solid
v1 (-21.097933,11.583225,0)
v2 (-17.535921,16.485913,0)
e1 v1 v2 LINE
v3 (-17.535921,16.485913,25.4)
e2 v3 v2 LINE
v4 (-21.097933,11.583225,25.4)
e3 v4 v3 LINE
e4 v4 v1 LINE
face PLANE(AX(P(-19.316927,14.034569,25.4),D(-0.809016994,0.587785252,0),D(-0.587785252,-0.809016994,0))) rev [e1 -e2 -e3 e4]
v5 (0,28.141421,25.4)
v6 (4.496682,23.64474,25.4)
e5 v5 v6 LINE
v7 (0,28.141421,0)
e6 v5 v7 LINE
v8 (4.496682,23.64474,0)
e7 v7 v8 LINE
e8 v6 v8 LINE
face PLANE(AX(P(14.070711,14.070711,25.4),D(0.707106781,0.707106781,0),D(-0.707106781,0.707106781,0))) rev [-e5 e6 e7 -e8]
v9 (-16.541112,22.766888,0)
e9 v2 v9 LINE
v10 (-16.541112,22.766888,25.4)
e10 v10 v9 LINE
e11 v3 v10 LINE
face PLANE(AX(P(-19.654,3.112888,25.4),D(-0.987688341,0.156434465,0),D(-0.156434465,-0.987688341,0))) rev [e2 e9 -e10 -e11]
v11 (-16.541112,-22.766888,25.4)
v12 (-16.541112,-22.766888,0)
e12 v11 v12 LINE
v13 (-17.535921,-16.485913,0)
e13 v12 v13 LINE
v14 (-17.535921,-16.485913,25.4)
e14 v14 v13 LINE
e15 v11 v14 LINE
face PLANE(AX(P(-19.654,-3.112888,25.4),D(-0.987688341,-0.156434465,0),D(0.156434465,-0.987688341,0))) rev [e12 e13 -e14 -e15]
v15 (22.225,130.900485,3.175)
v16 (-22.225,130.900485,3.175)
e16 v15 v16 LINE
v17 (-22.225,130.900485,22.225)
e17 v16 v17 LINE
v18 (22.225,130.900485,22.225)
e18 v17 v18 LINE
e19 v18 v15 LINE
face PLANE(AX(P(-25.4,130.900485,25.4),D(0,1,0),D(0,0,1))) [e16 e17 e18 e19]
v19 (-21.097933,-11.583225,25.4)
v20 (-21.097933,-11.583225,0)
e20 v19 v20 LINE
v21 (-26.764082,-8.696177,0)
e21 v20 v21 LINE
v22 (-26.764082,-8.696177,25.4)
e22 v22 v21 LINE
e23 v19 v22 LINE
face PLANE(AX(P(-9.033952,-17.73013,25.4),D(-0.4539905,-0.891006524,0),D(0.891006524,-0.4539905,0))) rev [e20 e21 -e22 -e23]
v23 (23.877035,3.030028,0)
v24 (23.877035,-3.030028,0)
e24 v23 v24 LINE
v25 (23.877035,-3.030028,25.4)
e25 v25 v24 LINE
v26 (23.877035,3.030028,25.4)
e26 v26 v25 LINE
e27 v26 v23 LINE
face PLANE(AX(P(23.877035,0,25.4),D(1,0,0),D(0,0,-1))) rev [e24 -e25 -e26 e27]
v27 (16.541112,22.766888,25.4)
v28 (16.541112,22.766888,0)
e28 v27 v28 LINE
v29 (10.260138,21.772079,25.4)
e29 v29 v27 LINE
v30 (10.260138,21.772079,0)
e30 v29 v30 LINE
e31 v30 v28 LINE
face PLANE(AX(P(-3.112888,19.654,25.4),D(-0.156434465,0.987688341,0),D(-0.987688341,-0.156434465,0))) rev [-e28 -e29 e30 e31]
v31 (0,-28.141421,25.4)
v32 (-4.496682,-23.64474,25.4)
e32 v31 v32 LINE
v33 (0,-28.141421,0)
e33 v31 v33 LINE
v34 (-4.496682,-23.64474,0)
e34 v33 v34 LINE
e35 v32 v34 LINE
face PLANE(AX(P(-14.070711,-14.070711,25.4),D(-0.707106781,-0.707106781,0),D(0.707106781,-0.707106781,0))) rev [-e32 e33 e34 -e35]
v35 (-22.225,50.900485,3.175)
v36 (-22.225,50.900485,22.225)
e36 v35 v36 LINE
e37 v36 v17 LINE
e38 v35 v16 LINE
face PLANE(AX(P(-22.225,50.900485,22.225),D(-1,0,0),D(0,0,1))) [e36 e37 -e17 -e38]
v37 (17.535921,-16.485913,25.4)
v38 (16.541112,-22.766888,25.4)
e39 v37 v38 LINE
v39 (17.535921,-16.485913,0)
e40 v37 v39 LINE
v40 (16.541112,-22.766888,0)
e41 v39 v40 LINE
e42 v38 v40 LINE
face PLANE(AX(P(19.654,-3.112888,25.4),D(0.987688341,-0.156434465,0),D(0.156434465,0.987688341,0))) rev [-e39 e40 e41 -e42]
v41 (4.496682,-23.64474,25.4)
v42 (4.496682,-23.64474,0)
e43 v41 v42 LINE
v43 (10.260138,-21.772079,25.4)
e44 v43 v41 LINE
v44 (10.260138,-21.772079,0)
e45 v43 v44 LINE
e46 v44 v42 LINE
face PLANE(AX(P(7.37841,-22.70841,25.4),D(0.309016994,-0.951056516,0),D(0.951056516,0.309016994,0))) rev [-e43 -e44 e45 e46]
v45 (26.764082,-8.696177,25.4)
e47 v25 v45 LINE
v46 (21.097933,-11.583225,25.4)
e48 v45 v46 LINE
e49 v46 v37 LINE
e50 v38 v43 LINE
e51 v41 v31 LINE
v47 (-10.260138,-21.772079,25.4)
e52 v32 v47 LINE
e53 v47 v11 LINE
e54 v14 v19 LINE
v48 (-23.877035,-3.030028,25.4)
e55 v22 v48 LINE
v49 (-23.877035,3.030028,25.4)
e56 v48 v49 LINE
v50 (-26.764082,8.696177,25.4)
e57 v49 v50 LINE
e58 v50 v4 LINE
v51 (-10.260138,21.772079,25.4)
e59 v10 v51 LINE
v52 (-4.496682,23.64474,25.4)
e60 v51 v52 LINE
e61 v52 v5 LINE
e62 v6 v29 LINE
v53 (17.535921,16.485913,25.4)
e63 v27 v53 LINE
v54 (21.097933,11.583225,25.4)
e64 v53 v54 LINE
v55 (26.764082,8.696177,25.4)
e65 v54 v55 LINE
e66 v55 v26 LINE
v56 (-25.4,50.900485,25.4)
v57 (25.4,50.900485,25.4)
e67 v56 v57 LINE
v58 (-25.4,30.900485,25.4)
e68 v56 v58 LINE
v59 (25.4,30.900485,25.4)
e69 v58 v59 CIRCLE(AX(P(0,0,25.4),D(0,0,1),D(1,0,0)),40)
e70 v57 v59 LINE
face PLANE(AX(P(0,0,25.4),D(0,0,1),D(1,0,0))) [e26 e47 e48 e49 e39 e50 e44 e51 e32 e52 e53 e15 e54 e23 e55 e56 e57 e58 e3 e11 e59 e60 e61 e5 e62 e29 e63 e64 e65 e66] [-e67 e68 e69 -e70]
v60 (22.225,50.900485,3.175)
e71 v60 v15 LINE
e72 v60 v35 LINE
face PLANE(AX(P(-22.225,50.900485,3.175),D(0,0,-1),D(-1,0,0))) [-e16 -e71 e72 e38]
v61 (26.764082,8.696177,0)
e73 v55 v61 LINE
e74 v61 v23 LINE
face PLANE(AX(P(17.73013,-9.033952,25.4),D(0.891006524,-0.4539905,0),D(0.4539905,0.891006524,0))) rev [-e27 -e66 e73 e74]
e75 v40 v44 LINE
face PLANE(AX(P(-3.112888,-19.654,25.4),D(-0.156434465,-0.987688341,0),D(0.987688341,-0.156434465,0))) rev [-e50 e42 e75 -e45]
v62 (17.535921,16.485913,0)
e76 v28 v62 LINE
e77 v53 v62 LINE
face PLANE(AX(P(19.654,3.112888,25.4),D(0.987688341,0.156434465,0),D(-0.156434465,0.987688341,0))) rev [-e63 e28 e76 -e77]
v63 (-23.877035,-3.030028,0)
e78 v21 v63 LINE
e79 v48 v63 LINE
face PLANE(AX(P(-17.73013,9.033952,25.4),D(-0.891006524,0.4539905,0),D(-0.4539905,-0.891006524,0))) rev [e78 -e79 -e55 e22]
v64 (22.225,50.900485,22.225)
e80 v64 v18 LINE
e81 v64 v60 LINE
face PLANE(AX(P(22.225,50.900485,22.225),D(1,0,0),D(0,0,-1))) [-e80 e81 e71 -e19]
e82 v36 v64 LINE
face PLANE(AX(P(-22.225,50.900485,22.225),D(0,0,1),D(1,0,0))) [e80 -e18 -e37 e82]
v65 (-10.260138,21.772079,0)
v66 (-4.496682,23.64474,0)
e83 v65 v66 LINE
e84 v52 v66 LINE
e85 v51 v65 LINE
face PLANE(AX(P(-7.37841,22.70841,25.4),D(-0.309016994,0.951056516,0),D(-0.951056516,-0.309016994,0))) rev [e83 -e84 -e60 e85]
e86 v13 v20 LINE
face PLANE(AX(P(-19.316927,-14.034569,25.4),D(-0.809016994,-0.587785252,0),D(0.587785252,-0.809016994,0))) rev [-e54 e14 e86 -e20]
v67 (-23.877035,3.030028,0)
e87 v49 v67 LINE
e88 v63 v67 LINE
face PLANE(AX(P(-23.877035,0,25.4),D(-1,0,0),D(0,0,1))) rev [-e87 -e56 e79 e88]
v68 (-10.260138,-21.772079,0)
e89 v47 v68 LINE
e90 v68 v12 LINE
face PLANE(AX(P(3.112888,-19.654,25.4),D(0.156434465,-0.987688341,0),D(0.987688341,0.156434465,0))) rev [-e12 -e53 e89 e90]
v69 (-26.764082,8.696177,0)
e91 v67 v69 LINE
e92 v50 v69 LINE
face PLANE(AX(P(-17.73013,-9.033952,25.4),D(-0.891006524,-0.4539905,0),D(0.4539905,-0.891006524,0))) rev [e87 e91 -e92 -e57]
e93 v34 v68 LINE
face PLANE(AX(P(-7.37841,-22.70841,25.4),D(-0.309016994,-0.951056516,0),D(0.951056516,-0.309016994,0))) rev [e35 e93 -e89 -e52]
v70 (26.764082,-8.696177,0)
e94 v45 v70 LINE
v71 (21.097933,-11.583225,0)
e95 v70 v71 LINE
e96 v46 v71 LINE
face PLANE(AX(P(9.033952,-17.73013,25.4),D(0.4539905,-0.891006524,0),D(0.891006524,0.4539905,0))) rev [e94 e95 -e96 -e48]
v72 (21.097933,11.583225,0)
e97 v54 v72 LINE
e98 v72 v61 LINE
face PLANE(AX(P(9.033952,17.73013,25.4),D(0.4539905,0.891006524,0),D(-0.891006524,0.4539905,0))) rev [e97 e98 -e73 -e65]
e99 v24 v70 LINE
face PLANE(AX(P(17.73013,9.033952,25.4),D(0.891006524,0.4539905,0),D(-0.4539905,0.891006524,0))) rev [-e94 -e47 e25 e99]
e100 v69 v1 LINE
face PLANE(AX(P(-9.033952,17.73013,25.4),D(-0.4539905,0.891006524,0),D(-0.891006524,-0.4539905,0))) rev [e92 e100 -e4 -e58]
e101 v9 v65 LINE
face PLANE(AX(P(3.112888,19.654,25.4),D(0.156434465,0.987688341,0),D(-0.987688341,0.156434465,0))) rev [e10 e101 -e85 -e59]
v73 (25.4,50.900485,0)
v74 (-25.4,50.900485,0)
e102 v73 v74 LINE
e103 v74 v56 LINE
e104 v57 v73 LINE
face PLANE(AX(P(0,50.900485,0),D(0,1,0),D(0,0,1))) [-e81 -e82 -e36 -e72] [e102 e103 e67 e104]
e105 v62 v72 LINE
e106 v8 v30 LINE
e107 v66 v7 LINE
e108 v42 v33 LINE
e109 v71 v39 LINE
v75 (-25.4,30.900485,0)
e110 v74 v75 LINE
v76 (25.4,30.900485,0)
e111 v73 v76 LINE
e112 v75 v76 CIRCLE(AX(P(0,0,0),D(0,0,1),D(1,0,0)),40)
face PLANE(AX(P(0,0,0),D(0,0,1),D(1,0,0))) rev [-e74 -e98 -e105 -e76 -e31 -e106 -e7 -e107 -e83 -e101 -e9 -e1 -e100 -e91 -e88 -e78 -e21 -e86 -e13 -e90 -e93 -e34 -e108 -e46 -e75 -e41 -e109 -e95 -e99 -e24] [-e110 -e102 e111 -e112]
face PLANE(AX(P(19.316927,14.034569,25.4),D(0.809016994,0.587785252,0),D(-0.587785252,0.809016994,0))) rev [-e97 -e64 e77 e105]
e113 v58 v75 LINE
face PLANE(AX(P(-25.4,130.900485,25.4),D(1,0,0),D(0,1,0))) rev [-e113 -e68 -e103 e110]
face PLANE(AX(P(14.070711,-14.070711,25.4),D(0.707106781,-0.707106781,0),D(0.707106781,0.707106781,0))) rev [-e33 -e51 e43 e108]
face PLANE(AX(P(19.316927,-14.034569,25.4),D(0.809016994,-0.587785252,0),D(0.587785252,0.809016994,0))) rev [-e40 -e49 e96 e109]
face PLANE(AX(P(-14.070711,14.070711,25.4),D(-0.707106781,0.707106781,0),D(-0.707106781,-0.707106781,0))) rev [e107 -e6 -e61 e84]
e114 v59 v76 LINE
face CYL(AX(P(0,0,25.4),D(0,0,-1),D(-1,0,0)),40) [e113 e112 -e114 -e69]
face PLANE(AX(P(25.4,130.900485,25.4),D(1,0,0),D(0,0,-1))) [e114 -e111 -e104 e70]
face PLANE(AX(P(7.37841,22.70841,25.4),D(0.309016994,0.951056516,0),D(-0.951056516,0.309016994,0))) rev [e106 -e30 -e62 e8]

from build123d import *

# Parameters (mm, degrees)
BOSS_EXTRUDE2_DEPTH      = 25.4
CUT_EXTRUDE2_START       = 50.900485433
CUT_EXTRUDE2_OUTLINE_W   = 50.8
CUT_EXTRUDE2_OUTLINE_H   = 25.4
CUT_EXTRUDE2_OUTLINE_W_2 = 44.45
CUT_EXTRUDE2_OUTLINE_H_2 = 19.05
CUT_EXTRUDE2_DEPTH       = 80


# Read off the part's stored shape, not the designer's step: Cut-Extrude2
with BuildPart() as part:
    # Sketch2 → Boss-Extrude2 (new body)
    with BuildSketch(Plane.XY):
        with BuildLine():
            Line((-25.4, 130.900485433), (25.4, 130.900485433))
            Line((25.4, 130.900485433), (25.4, 30.900485433))
            ThreePointArc((25.4, 30.900485433), (0, -40), (-25.4, 30.900485433))
            Line((-25.4, 30.900485433), (-25.4, 130.900485433))
        make_face()
        Polygon((-16.541112452, 22.766888123), (-10.26013758, 21.772079433), (-4.496681536, 23.64473982), (0, 28.141421356), (4.496681536, 23.64473982), (10.26013758, 21.772079433), (16.541112452, 22.766888123), (17.535921141, 16.485913251), (21.09793287, 11.583224708), (26.764082159, 8.696177445), (23.877034895, 3.030028156), (23.877034895, -3.030028156), (26.764082159, -8.696177445), (21.09793287, -11.583224708), (17.535921141, -16.485913251), (16.541112452, -22.766888123), (10.26013758, -21.772079433), (4.496681536, -23.64473982), (0, -28.141421356), (-4.496681536, -23.64473982), (-10.26013758, -21.772079433), (-16.541112452, -22.766888123), (-17.535921141, -16.485913251), (-21.09793287, -11.583224708), (-26.764082159, -8.696177445), (-23.877034895, -3.030028156), (-23.877034895, 3.030028156), (-26.764082159, 8.696177445), (-21.09793287, 11.583224708), (-17.535921141, 16.485913251), align=None, mode=Mode.SUBTRACT)
    extrude(amount=BOSS_EXTRUDE2_DEPTH)

    # Cut-Extrude2 outline → Cut-Extrude2 (cut)
    with BuildSketch(Plane(origin=(0, 0, 0), x_dir=(1, 0, 0), z_dir=(0, 1, 0)).offset(CUT_EXTRUDE2_START)):
        with Locations((0, -12.7)):
            Rectangle(CUT_EXTRUDE2_OUTLINE_W, CUT_EXTRUDE2_OUTLINE_H)
        with Locations((0, -12.7)):
            Rectangle(CUT_EXTRUDE2_OUTLINE_W_2, CUT_EXTRUDE2_OUTLINE_H_2, mode=Mode.SUBTRACT)
    extrude(amount=CUT_EXTRUDE2_DEPTH, mode=Mode.SUBTRACT)


solid = part.part
